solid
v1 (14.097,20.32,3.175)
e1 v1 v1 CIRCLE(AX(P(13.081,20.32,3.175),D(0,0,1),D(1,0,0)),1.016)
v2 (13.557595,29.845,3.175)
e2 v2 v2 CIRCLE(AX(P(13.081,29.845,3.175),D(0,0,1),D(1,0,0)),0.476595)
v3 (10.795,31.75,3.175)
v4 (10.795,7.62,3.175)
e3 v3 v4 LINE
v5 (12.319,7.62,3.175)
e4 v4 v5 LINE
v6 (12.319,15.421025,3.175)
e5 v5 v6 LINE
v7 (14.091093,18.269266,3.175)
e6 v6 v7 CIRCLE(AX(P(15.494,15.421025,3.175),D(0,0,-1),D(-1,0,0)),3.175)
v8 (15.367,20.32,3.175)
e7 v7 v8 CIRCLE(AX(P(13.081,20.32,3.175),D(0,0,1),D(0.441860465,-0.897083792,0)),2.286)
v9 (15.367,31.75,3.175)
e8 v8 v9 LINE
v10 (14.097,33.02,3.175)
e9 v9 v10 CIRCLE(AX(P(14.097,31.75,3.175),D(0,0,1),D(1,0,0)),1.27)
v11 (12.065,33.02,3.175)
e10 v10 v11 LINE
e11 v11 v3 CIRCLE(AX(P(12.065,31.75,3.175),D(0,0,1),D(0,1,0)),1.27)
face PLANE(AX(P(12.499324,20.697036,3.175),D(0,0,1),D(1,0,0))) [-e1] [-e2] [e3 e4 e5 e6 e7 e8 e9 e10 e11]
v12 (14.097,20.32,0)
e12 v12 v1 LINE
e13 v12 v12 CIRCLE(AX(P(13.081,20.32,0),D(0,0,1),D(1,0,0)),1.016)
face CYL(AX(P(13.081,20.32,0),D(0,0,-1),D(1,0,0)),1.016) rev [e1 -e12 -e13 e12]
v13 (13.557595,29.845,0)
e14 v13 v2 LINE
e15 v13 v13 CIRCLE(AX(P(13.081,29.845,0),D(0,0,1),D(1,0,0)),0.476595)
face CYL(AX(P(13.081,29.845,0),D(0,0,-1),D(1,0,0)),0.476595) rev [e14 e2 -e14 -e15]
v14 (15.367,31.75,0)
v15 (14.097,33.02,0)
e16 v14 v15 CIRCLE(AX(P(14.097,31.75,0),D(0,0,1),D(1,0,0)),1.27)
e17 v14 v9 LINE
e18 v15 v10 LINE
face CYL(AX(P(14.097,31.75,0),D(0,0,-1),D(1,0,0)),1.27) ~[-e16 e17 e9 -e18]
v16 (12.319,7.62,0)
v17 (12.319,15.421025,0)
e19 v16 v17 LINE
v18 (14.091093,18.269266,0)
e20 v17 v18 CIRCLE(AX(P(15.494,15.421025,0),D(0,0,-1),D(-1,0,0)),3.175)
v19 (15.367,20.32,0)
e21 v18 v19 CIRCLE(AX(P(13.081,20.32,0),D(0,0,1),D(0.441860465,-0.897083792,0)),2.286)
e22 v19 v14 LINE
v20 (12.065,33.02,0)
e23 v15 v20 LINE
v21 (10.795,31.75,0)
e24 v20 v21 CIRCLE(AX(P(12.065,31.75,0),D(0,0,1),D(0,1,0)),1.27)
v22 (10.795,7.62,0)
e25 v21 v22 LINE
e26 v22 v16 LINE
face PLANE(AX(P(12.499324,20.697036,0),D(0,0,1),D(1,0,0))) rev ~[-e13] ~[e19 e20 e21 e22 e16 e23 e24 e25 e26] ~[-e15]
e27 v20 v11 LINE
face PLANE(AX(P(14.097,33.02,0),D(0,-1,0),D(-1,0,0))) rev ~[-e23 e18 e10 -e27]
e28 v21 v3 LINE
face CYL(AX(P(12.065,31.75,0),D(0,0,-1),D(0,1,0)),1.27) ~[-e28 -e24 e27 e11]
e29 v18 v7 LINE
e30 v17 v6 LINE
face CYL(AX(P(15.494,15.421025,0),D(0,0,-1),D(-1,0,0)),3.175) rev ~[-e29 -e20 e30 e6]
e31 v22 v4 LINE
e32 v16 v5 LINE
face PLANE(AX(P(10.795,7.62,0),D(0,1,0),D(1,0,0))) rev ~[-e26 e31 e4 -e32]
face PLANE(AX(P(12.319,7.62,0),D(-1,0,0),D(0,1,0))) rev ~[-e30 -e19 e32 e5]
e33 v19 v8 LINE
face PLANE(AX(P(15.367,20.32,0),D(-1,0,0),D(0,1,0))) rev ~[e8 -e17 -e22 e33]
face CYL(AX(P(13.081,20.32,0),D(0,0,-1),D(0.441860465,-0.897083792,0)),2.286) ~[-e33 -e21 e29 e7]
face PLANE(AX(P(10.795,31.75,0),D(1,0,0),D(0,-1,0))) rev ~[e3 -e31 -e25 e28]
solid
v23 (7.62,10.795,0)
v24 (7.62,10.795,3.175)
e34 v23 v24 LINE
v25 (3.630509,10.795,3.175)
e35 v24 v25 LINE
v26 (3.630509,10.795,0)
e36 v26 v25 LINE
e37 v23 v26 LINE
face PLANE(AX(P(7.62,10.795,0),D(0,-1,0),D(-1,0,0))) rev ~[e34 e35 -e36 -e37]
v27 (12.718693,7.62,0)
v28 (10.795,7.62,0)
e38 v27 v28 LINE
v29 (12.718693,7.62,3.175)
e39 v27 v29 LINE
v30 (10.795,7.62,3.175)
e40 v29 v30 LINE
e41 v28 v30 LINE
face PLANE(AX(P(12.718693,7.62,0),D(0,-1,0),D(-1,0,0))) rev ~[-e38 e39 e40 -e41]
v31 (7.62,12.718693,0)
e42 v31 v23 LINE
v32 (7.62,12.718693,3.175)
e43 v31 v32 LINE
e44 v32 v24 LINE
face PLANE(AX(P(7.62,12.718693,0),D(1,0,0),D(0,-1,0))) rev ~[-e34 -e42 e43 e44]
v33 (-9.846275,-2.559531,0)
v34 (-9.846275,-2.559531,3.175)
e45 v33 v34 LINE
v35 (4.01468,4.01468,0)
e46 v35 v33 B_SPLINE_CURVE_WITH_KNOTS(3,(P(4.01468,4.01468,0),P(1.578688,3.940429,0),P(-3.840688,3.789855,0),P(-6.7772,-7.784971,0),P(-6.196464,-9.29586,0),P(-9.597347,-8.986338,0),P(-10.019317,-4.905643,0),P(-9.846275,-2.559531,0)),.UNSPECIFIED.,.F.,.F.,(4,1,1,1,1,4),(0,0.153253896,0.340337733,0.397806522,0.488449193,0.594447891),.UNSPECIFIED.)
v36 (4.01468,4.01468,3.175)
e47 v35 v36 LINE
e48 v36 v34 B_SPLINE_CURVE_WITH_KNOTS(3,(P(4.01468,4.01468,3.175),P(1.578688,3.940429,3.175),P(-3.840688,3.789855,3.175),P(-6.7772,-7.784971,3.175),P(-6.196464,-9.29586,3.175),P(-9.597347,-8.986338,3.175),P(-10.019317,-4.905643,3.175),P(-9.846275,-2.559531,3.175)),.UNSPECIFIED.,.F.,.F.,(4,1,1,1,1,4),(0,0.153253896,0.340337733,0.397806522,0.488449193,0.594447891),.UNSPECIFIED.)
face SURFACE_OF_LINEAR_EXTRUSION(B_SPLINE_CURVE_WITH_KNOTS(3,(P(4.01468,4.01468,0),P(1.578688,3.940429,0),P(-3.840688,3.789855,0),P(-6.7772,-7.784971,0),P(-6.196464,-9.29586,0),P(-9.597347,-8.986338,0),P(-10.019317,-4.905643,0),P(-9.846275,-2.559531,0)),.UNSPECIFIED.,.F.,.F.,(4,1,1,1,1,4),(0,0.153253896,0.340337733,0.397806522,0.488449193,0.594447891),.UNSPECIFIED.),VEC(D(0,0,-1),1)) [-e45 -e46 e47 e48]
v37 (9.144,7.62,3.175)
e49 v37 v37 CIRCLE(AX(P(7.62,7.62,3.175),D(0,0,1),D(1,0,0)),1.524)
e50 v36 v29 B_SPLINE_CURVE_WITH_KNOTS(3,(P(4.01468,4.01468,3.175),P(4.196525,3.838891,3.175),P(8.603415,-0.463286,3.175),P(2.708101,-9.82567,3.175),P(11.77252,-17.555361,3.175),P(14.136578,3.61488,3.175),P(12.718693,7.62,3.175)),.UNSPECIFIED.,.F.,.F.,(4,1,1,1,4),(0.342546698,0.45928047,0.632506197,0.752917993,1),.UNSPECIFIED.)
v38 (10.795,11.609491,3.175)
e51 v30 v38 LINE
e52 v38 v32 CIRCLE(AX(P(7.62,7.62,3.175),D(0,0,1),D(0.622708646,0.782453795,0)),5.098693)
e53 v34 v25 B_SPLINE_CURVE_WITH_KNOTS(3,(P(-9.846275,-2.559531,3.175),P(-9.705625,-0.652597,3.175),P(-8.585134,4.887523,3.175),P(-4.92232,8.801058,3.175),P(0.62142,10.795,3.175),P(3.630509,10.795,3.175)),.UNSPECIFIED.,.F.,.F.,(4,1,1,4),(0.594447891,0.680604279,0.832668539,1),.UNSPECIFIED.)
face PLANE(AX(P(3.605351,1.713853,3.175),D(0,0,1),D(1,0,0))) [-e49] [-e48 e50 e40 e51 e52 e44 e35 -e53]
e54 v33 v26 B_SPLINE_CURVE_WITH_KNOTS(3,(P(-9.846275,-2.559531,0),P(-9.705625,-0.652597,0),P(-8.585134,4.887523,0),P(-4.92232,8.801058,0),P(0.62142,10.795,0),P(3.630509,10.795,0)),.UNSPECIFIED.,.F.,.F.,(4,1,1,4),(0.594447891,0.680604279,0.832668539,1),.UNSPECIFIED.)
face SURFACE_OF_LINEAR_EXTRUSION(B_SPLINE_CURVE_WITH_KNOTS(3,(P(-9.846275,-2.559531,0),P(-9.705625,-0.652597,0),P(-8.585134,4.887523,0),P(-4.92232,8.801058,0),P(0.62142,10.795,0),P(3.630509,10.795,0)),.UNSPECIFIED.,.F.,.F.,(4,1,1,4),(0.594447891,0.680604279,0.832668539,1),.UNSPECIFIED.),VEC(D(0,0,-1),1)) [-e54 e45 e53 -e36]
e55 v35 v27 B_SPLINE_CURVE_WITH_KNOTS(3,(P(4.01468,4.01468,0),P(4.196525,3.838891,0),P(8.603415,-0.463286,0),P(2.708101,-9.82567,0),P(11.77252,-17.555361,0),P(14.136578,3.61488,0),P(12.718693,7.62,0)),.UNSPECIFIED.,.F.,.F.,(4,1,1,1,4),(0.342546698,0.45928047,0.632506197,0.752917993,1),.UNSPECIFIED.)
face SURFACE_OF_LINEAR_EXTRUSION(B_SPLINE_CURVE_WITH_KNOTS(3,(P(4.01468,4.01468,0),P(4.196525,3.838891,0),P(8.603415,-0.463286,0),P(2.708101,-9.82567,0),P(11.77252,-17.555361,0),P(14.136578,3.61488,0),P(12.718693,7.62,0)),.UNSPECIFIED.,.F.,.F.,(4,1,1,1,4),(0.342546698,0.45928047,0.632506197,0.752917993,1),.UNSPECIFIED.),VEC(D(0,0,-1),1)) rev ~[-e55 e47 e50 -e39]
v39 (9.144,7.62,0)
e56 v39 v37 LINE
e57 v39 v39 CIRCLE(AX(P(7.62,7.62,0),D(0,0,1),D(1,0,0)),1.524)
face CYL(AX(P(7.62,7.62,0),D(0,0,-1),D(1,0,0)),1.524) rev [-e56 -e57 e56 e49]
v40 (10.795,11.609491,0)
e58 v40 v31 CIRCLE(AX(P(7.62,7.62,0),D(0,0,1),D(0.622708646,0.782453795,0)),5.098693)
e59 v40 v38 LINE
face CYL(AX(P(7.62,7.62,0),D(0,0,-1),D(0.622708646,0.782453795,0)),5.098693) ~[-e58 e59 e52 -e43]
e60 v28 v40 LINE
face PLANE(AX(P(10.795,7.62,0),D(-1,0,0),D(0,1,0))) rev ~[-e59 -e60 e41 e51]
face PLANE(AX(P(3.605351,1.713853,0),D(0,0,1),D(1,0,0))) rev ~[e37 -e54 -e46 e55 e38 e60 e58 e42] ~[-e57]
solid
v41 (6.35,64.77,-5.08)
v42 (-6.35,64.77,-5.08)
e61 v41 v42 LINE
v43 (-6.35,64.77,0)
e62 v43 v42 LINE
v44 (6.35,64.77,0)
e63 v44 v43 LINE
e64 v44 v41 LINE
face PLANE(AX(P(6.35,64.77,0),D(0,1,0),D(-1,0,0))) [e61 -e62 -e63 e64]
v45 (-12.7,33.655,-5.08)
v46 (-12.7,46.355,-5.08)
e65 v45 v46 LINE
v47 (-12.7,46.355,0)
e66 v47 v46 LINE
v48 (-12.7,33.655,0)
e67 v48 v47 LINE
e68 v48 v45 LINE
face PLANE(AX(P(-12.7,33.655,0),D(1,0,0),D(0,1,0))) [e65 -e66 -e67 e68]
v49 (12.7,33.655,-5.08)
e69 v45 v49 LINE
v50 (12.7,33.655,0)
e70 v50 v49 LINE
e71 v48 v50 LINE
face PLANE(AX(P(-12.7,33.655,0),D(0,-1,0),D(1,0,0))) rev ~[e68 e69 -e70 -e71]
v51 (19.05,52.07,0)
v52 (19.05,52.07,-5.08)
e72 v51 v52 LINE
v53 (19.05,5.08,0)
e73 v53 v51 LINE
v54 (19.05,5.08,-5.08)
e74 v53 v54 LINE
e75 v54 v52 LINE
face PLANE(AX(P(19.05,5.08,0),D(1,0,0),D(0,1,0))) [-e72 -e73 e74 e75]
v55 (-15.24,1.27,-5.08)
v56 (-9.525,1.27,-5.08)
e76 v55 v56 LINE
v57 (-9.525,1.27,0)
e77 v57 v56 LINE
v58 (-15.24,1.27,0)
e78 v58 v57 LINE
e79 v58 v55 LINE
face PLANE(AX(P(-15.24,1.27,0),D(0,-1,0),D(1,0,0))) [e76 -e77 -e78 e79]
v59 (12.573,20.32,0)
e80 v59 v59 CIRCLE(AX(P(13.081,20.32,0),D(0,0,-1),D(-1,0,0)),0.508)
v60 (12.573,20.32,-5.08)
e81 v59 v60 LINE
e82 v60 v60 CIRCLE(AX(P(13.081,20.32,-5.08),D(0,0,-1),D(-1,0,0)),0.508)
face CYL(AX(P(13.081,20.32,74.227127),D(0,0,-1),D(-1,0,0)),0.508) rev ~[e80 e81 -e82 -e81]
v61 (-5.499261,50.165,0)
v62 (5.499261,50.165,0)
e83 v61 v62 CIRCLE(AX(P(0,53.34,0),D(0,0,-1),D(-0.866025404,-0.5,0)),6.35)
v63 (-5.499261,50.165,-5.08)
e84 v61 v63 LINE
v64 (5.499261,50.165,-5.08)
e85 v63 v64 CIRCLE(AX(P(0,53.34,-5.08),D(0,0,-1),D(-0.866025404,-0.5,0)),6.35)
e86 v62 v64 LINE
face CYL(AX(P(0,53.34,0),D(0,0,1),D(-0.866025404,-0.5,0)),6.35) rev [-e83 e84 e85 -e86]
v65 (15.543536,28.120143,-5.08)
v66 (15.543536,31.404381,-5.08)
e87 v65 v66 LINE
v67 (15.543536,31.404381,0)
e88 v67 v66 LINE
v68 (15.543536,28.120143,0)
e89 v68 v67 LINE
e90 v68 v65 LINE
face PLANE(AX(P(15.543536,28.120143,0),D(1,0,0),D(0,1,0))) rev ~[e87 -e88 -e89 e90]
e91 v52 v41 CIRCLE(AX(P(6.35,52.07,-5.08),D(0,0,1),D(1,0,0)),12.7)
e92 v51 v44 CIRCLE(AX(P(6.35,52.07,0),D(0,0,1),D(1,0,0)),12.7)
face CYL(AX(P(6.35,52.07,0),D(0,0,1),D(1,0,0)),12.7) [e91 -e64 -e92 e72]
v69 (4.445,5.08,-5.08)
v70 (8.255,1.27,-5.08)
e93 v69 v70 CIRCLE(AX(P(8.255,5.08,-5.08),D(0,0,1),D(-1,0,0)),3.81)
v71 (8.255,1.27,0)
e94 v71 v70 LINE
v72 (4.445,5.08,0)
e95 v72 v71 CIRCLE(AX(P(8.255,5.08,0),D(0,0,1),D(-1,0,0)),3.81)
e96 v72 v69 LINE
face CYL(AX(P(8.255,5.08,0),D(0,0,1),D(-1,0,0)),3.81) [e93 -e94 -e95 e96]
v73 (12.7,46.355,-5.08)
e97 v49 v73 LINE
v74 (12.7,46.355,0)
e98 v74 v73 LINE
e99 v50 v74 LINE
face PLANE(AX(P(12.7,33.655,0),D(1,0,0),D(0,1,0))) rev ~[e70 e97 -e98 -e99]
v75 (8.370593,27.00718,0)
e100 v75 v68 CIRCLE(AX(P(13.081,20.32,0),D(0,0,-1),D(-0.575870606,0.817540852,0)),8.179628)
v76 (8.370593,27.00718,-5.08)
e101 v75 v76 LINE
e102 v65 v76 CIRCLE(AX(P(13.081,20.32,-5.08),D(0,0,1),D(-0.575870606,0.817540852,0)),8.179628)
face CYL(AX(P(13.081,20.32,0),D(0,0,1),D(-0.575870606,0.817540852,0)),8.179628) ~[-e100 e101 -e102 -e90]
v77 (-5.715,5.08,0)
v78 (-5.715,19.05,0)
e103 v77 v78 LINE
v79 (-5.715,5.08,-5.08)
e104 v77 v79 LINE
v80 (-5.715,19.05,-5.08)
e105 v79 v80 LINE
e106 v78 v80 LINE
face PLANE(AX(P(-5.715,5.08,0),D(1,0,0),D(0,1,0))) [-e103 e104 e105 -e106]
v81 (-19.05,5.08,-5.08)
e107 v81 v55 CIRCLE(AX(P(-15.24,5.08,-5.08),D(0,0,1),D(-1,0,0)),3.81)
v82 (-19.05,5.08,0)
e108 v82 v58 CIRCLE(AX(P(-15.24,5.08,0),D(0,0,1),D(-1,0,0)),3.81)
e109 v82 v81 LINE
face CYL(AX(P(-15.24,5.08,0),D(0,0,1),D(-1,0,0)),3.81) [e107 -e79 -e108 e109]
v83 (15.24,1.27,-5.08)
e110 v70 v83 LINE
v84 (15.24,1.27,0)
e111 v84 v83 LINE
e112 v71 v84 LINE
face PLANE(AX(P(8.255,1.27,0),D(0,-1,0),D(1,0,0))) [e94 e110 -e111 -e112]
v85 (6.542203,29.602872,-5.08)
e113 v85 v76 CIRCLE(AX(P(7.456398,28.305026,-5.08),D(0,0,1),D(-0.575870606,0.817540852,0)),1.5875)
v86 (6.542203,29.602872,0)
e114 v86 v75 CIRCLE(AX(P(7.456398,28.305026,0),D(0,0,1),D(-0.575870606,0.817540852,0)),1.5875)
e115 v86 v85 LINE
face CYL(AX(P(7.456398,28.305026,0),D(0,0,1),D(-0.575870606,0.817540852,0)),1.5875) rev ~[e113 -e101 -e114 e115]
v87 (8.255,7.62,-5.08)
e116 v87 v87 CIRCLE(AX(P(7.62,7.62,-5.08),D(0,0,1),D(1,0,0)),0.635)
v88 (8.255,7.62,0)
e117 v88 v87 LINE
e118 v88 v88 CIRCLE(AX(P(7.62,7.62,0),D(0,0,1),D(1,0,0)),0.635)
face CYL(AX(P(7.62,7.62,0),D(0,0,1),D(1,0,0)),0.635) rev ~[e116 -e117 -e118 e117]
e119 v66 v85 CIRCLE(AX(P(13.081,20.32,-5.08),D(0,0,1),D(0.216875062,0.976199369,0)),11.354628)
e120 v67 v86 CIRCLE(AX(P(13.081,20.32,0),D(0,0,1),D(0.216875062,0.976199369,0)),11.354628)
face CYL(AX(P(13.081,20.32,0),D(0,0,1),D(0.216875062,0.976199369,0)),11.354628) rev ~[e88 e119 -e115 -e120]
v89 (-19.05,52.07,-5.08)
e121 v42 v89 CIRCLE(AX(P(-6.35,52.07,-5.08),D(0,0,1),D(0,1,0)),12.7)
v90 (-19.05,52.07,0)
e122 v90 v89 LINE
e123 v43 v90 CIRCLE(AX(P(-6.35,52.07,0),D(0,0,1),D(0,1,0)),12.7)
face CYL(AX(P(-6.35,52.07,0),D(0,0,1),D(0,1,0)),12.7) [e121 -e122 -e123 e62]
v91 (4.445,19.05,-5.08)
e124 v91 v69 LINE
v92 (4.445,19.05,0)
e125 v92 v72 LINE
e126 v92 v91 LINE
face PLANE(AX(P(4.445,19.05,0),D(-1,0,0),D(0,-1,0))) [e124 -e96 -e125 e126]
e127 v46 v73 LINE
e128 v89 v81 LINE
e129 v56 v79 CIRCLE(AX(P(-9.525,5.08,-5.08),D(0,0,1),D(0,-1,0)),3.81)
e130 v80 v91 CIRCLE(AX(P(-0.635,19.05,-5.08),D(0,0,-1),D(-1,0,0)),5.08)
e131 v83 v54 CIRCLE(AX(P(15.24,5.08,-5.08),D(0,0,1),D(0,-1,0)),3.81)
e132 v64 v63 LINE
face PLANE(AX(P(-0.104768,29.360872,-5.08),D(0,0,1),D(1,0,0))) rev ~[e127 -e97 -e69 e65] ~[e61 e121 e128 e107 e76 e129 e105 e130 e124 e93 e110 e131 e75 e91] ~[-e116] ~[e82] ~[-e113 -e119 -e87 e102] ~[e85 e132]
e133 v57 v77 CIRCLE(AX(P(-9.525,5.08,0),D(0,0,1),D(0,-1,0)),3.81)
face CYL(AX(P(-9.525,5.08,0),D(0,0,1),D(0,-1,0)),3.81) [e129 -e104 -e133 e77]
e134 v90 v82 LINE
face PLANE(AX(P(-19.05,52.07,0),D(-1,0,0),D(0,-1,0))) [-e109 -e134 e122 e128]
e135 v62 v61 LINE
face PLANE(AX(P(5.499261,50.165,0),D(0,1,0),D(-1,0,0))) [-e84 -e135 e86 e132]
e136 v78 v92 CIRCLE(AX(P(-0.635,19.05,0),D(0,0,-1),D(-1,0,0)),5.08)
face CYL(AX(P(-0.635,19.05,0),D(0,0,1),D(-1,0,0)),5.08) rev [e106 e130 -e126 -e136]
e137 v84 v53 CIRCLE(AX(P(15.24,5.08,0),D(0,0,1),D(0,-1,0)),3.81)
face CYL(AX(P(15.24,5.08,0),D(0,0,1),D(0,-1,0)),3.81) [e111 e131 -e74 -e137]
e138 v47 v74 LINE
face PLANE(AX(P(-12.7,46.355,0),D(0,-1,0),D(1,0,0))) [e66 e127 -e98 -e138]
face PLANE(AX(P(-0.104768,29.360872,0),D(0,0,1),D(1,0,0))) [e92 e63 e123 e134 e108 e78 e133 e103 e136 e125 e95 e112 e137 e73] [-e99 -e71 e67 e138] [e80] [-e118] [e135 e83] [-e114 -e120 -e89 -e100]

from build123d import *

# Parameters (mm, degrees)
F0_R      = 1.524
F1_DEPTH  = 3.175
F2_R      = 0.635
F3_DEPTH  = 5.08
F4_R      = 1.016
F4_R_2    = 0.4765946888
F5_DEPTH  = 3.175
F6_D      = 1.016
F8_DEPTH  = 25.4
F9_W      = 25.4
F9_H      = 12.7
F10_DEPTH = 25.4


with BuildPart() as f1:
    # F0 (on Top) → F1 (new body)
    with BuildSketch(Plane.XY):
        with BuildLine():
            add(Edge.make_bspline(
                [(4.0146798487, 4.0146798487), (4.1965253446, 3.8388911287), (8.6034145204, -0.4632855785), (2.7081005667, -9.8256704348), (11.7725199973, -17.5553609081), (14.1365779009, 3.6148799922), (12.7186926547, 7.62)],
                knots=[0.342546698, 0.342546698, 0.342546698, 0.342546698, 0.4592804701, 0.6325061967, 0.7529179928, 1, 1, 1, 1], degree=3))
            Line((12.7186926547, 7.62), (10.795, 7.62))
            Line((10.795, 7.62), (10.795, 11.6094914196))
            ThreePointArc((10.795, 11.6094914196), (9.3015879683, 12.4334113363), (7.62, 12.7186926547))
            Line((7.62, 12.7186926547), (7.62, 10.795))
            Line((7.62, 10.795), (3.6305085804, 10.795))
            add(Edge.make_bspline(
                [(-9.8462747246, -2.5595309993), (-9.7056248656, -0.6525965961), (-8.5851336869, 4.887523046), (-4.9223199156, 8.8010582074), (0.6214204647, 10.795), (3.6305085804, 10.795)],
                knots=[0.5944478908, 0.5944478908, 0.5944478908, 0.5944478908, 0.6806042793, 0.8326685389, 1, 1, 1, 1], degree=3))
            add(Edge.make_bspline(
                [(-9.8462747246, -2.5595309993), (-8.3692950914, 1.0159390836), (-1.2709087492, 7.2679963496), (3.9839462531, 4.0422517138), (3.9949946041, 4.0337094316), (4.0146798487, 4.0146798487)],
                knots=[0.0522687231, 0.0522687231, 0.0522687231, 0.0522687231, 0.2064144516, 0.3299099657, 0.342546698, 0.342546698, 0.342546698, 0.342546698], degree=3))
        make_face()
        with Locations((7.62, 7.62)):
            Circle(F0_R, mode=Mode.SUBTRACT)
        with BuildLine():
            add(Edge.make_bspline(
                [(4.0146798487, 4.0146798487), (1.5786877312, 3.9404286991), (-3.8406877482, 3.7898553775), (-6.77720019, -7.7849709454), (-6.196463978, -9.2958597248), (-9.5973471823, -8.9863377062), (-10.0193170502, -4.9056432962), (-9.8462747246, -2.5595309993)],
                knots=[0, 0, 0, 0, 0.1532538956, 0.3403377332, 0.3978065221, 0.4884491935, 0.5944478908, 0.5944478908, 0.5944478908, 0.5944478908], degree=3))
            add(Edge.make_bspline(
                [(-9.8462747246, -2.5595309993), (-8.3692950914, 1.0159390836), (-1.2709087492, 7.2679963496), (3.9839462531, 4.0422517138), (3.9949946041, 4.0337094316), (4.0146798487, 4.0146798487)],
                knots=[0.0522687231, 0.0522687231, 0.0522687231, 0.0522687231, 0.2064144516, 0.3299099657, 0.342546698, 0.342546698, 0.342546698, 0.342546698], degree=3))
        make_face()
    extrude(amount=F1_DEPTH)


with BuildPart() as f3:
    # F2 (on Top) → F3 (new body)
    with BuildSketch(Plane.XY):
        with BuildLine():
            Line((6.35, 64.77), (-6.35, 64.77))
            ThreePointArc((-6.35, 64.77), (-15.3302561211, 61.0502561211), (-19.05, 52.07))
            Line((-19.05, 52.07), (-19.05, 5.08))
            ThreePointArc((-19.05, 5.08), (-17.9340768363, 2.3859231637), (-15.24, 1.27))
            Line((-15.24, 1.27), (-9.525, 1.27))
            ThreePointArc((-9.525, 1.27), (-6.8309231637, 2.3859231637), (-5.715, 5.08))
            Line((-5.715, 5.08), (-5.715, 19.05))
            ThreePointArc((-5.715, 19.05), (-0.635, 24.13), (4.445, 19.05))
            Line((4.445, 19.05), (4.445, 5.08))
            ThreePointArc((4.445, 5.08), (5.5609231637, 2.3859231637), (8.255, 1.27))
            Line((8.255, 1.27), (15.24, 1.27))
            ThreePointArc((15.24, 1.27), (17.9340768363, 2.3859231637), (19.05, 5.08))
            Line((19.05, 5.08), (19.05, 52.07))
            ThreePointArc((19.05, 52.07), (15.3302561211, 61.0502561211), (6.35, 64.77))
        make_face()
        with Locations((7.62, 7.62)):
            Circle(F2_R, mode=Mode.SUBTRACT)
        with BuildLine():
            ThreePointArc((-5.499261314, 50.165), (0, 59.69), (5.499261314, 50.165))
            Line((5.499261314, 50.165), (-5.499261314, 50.165))
        make_face(mode=Mode.SUBTRACT)
    extrude(amount=-F3_DEPTH)

    # F6 (through all)
    with Locations(Plane.XY):
        with Locations((13.081, 20.32)):
            Hole(F6_D / 2)

    # F7 (on face) → F8 (cut)
    with BuildSketch(Plane.XY):
        with BuildLine():
            Line((15.5435356842, 28.1201432546), (15.5435356842, 31.4043808392))
            ThreePointArc((15.5435356842, 31.4043808392), (10.8526970709, 31.4538334208), (6.542203401, 29.6028723799))
            ThreePointArc((6.542203401, 29.6028723799), (6.1585518853, 27.3908316899), (8.3705925754, 27.0071801742))
            ThreePointArc((8.3705925754, 27.0071801742), (11.826845486, 28.4029087118), (15.5435356842, 28.1201432546))
        make_face()
    extrude(amount=-F8_DEPTH, mode=Mode.SUBTRACT)

    # F9 (on face) → F10 (cut)
    with BuildSketch(Plane.XY):
        with Locations((0, 40.005)):
            Rectangle(F9_W, F9_H)
    extrude(amount=-F10_DEPTH, mode=Mode.SUBTRACT)


with BuildPart() as f5:
    # F4 (on face) → F5 (new body)
    with BuildSketch(Plane.XY):
        with BuildLine():
            Line((10.795, 31.75), (10.795, 7.62))
            Line((10.795, 7.62), (12.319, 7.62))
            Line((12.319, 7.62), (12.319, 15.4210254134))
            ThreePointArc((12.319, 15.4210254134), (12.7981833657, 17.09828439), (14.0910930233, 18.2692664521))
            ThreePointArc((14.0910930233, 18.2692664521), (15.0219879767, 19.1123735369), (15.367, 20.32))
            Line((15.367, 20.32), (15.367, 31.75))
            ThreePointArc((15.367, 31.75), (14.9950256121, 32.6480256121), (14.097, 33.02))
            Line((14.097, 33.02), (12.065, 33.02))
            ThreePointArc((12.065, 33.02), (11.1669743879, 32.6480256121), (10.795, 31.75))
        make_face()
        with Locations((13.081, 20.32)):
            Circle(F4_R, mode=Mode.SUBTRACT)
        with Locations((13.081, 29.845)):
            Circle(F4_R_2, mode=Mode.SUBTRACT)
    extrude(amount=F5_DEPTH)


solid = Compound([f1.part, f3.part, f5.part])
